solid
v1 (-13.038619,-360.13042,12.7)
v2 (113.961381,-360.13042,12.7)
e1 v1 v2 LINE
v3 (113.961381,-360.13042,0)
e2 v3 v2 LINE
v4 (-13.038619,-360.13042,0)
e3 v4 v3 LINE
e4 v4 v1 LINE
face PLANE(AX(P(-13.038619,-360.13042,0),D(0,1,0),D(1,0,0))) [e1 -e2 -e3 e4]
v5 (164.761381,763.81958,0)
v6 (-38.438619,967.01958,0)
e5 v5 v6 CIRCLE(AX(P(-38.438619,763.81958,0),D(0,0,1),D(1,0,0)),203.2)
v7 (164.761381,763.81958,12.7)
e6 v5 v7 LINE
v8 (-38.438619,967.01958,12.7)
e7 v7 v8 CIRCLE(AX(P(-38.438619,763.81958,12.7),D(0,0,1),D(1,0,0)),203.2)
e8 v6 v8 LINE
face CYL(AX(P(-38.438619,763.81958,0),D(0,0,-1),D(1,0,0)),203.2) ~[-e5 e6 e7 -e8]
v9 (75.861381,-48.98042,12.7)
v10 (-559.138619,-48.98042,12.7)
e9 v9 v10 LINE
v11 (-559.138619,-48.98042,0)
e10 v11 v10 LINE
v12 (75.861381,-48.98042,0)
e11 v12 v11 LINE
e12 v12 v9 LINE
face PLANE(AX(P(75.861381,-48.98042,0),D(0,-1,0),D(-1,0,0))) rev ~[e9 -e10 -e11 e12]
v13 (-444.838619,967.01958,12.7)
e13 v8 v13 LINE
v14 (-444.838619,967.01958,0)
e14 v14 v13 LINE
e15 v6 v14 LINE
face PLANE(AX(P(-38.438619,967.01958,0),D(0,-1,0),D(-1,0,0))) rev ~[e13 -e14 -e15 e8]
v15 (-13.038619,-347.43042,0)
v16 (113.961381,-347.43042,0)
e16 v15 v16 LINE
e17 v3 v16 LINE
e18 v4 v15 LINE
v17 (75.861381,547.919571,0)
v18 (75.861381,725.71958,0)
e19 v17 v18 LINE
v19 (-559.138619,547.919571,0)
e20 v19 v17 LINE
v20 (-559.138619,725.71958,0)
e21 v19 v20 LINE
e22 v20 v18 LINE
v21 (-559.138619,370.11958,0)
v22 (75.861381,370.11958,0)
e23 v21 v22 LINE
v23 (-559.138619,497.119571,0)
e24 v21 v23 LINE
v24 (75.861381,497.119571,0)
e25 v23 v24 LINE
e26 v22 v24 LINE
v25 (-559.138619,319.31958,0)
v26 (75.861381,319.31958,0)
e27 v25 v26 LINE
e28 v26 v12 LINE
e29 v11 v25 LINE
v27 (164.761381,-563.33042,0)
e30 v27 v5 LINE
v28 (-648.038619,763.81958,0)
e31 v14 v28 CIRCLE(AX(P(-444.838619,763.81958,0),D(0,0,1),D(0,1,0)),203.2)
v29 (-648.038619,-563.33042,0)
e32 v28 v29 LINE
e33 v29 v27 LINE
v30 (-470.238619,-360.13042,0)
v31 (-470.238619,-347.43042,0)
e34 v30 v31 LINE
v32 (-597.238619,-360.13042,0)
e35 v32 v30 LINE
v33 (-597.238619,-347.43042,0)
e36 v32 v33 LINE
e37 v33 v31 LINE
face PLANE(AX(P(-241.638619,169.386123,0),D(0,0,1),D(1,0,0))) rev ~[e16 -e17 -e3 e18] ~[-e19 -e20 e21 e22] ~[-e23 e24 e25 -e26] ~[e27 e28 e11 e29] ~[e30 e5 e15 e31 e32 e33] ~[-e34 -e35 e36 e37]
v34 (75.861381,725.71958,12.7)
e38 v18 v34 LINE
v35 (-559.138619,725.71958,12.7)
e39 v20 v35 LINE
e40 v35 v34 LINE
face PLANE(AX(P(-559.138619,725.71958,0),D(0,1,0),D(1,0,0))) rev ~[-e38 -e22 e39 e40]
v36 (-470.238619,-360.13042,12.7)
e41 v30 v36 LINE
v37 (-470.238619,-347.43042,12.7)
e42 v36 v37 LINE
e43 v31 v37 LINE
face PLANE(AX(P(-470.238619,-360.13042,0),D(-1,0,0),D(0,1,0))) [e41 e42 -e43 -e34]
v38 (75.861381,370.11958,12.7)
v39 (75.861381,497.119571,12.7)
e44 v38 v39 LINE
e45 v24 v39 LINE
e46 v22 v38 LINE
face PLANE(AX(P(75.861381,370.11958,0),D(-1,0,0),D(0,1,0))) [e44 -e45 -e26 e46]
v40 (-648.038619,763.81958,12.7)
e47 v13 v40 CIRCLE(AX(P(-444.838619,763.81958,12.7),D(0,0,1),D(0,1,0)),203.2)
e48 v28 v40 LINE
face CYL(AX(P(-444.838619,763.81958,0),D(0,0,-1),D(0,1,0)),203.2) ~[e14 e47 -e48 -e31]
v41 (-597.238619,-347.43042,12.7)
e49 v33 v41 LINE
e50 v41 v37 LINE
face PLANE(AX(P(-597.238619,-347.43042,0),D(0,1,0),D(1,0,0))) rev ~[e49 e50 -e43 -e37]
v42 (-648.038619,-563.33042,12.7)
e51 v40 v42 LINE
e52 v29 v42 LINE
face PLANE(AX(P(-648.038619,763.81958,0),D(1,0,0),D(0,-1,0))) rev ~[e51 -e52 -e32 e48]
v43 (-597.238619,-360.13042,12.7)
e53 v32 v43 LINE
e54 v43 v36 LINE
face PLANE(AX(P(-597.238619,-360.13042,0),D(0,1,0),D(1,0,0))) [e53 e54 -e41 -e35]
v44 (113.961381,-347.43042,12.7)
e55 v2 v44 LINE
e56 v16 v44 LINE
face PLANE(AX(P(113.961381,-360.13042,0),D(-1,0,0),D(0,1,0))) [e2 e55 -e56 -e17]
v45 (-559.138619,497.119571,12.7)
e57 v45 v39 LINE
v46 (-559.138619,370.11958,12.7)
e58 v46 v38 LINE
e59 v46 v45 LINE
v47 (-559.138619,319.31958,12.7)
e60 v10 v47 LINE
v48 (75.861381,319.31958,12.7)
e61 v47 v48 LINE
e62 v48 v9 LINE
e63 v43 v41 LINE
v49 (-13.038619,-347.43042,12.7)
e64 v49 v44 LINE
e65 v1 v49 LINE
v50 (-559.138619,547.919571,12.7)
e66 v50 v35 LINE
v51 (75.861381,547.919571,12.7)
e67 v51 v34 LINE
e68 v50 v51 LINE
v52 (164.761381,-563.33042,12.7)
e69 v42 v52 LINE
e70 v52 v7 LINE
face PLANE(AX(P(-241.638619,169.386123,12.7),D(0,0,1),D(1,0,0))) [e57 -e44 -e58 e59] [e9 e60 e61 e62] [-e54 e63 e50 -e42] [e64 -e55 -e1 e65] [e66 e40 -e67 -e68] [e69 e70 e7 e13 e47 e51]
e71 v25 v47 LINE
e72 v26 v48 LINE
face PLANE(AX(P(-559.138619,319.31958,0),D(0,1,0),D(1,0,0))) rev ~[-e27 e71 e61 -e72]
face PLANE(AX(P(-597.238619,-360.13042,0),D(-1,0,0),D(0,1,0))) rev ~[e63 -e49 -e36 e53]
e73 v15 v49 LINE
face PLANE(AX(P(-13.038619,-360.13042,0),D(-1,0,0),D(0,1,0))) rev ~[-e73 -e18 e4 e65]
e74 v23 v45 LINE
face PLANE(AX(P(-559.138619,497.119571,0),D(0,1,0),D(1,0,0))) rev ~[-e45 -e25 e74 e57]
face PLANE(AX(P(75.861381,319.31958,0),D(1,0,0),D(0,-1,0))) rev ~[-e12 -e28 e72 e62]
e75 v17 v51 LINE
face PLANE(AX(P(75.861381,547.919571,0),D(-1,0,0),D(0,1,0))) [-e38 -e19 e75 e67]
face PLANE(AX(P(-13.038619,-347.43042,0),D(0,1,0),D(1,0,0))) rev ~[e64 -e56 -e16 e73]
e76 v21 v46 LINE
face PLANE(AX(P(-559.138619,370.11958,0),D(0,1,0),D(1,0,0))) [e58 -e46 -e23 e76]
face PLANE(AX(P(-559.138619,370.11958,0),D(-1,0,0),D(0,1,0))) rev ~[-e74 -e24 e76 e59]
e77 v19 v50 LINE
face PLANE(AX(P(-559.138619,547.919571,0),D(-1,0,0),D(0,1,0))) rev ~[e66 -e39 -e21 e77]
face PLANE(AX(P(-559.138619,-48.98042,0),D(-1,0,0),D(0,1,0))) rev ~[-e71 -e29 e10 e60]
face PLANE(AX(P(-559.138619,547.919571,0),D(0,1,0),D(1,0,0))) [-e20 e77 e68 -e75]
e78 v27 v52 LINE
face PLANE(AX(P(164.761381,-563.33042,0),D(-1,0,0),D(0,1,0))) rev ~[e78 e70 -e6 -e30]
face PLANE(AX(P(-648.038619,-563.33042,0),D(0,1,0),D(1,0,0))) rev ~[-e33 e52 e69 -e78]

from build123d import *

# Parameters (mm, degrees)
F0_W     = 127
F0_H     = 12.7
F0_W_2   = 635
F0_H_2   = 126.9999911487
F0_H_3   = 177.8000088513
F1_DEPTH = 12.7


# Not quite as in the source:
# - a feature names something its author has since deleted; it is built from what else it names


with BuildPart() as f1:
    # F0 (on Top) → F1 (new body)
    with BuildSketch(Plane.XY):
        with BuildLine():
            ThreePointArc((-444.8386187891, 967.019580251), (-588.5227167262, 907.5036781881), (-648.0386187891, 763.819580251))
            Line((-648.0386187891, 763.819580251), (-648.0386187891, -556.980419749))
            Line((-648.0386187891, -556.980419749), (-648.0386187891, -563.330419749))
            Line((-648.0386187891, -563.330419749), (164.7613812109, -563.330419749))
            Line((164.7613812109, -563.330419749), (164.7613812109, -556.980419749))
            Line((164.7613812109, -556.980419749), (164.7613812109, 763.819580251))
            ThreePointArc((164.7613812109, 763.819580251), (105.245479148, 907.5036781881), (-38.4386187891, 967.019580251))
            Line((-38.4386187891, 967.019580251), (-444.8386187891, 967.019580251))
        make_face()
        with Locations((-533.7386187891, -353.780419749)):
            Rectangle(F0_W, F0_H, mode=Mode.SUBTRACT)
        with Locations((50.4613812109, -353.780419749)):
            Rectangle(F0_W, F0_H, mode=Mode.SUBTRACT)
        Polygon((75.8613812109, -48.980419749), (-559.1386187891, -48.980419749), (-559.1386187891, 90.719580251), (-559.1386187891, 141.519580251), (-559.1386187891, 319.319580251), (75.8613812109, 319.319580251), (75.8613812109, 141.519580251), (75.8613812109, 90.719580251), align=None, mode=Mode.SUBTRACT)
        with Locations((-241.6386187891, 433.6195758253)):
            Rectangle(F0_W_2, F0_H_2, mode=Mode.SUBTRACT)
        with Locations((-241.6386187891, 636.8195758253)):
            Rectangle(F0_W_2, F0_H_3, mode=Mode.SUBTRACT)
    extrude(amount=F1_DEPTH)


solid = f1.part
